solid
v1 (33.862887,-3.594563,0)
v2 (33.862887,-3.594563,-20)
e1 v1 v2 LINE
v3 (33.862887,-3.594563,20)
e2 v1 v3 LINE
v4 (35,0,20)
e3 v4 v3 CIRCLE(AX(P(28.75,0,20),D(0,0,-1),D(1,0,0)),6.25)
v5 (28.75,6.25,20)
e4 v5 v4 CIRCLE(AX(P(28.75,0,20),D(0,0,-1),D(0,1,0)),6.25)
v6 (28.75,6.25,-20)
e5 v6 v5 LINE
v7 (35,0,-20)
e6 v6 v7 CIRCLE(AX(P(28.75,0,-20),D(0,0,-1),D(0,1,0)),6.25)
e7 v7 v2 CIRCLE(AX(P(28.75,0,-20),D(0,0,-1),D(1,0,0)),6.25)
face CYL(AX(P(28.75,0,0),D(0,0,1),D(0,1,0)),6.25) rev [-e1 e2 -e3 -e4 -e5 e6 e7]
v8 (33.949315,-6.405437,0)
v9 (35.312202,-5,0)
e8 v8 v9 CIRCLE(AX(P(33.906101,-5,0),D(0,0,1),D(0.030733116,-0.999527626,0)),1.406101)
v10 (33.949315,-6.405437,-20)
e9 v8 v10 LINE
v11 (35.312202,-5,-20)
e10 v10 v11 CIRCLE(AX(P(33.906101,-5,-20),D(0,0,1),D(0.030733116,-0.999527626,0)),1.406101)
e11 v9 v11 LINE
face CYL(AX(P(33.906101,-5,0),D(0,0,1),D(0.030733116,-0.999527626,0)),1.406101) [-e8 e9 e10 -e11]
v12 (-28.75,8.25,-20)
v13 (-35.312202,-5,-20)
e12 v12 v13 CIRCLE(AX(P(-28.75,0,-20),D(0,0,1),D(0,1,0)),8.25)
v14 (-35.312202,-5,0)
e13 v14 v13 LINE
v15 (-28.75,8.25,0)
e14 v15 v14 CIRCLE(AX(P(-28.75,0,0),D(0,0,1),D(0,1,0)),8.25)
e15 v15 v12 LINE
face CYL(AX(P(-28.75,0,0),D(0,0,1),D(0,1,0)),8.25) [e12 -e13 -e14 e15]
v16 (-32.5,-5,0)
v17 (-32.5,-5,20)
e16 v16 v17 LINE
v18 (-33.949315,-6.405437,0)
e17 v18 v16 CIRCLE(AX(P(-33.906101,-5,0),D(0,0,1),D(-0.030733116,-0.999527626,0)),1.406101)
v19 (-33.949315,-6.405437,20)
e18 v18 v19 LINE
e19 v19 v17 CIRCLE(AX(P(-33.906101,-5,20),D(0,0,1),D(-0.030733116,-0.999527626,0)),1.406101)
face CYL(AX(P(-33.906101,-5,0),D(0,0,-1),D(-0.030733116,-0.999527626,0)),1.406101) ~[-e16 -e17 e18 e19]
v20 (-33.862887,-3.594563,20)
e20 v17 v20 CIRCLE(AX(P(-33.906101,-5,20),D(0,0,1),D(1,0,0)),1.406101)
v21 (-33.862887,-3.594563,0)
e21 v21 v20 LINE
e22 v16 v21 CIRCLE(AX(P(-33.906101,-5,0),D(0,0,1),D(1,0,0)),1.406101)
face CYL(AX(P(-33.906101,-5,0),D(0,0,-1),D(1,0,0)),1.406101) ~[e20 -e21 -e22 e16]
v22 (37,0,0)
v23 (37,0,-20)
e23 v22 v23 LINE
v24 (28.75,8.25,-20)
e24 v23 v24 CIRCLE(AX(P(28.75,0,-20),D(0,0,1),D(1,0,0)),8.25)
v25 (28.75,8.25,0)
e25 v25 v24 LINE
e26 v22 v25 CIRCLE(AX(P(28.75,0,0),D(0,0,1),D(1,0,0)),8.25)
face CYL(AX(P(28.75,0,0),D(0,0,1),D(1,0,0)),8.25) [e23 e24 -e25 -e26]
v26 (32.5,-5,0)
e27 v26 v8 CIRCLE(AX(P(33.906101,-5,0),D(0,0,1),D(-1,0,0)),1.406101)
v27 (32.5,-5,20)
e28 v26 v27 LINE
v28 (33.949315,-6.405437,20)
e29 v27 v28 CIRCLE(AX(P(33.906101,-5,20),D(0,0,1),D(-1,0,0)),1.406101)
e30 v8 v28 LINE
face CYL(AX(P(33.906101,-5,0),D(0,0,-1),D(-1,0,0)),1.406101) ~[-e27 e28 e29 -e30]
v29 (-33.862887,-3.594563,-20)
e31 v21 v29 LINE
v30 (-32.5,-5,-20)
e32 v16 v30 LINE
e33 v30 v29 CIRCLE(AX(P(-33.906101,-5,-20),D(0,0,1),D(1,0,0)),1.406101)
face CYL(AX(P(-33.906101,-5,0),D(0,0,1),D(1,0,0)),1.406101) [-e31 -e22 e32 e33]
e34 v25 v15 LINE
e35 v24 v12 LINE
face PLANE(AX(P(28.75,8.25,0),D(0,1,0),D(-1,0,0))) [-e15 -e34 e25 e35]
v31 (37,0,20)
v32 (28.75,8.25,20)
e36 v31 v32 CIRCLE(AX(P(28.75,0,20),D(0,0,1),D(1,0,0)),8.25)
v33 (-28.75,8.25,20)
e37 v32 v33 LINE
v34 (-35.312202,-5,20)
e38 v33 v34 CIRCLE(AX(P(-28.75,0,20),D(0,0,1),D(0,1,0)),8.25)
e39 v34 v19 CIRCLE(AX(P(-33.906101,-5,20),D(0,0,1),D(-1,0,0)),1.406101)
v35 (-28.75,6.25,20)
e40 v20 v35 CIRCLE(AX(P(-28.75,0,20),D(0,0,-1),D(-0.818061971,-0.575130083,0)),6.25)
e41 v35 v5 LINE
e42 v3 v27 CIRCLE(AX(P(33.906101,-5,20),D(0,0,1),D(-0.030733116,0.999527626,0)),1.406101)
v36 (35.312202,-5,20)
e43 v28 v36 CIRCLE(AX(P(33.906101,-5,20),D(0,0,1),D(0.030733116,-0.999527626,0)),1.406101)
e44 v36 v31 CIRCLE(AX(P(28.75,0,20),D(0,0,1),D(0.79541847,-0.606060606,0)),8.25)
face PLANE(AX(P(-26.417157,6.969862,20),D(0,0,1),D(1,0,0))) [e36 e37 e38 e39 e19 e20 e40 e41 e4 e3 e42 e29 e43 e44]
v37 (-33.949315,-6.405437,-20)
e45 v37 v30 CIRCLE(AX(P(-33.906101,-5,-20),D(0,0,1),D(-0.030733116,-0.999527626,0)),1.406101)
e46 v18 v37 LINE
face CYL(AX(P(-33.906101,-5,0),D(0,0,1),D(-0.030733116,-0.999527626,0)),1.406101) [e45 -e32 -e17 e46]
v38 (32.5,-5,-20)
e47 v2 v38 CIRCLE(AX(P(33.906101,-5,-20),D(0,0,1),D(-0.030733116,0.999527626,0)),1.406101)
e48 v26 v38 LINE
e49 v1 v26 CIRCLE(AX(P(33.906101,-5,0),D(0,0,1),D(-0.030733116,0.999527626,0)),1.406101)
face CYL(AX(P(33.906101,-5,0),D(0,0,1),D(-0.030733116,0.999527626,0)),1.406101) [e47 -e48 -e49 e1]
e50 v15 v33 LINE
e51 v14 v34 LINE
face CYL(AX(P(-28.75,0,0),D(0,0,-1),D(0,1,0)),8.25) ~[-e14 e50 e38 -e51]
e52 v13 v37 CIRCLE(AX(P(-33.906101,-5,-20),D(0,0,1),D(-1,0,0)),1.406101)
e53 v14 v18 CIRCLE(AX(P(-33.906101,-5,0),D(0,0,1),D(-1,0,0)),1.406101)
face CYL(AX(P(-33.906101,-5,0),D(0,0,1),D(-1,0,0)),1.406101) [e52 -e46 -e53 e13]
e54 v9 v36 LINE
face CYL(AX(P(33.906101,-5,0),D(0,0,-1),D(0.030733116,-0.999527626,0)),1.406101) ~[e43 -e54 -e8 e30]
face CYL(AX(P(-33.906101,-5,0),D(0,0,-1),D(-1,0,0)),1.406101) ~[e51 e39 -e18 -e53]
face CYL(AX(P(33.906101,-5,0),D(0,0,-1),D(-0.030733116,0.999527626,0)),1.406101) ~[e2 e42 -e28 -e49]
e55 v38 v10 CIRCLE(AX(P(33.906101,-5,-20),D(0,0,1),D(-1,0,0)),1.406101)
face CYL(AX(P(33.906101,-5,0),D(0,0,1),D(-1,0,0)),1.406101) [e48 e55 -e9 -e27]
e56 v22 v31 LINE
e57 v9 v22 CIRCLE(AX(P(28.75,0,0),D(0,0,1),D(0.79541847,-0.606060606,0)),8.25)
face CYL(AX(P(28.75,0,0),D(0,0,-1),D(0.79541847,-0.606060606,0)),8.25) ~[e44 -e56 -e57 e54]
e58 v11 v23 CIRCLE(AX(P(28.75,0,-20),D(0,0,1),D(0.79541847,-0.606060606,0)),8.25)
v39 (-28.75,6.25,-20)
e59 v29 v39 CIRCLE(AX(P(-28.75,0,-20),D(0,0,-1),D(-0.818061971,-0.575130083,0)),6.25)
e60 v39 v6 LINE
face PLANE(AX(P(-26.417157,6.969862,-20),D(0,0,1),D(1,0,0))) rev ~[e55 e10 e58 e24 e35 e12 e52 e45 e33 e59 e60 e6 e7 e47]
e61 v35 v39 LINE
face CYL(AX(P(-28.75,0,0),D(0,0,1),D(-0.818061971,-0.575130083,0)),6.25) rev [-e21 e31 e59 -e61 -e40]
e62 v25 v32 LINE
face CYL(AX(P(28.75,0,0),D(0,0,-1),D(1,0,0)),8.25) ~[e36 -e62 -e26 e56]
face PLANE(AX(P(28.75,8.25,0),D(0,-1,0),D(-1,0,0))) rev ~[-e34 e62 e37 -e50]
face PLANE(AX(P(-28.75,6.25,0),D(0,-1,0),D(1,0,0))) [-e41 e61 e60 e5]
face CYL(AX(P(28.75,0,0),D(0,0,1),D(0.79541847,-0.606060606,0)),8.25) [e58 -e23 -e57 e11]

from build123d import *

# Parameters (mm, degrees)
F1_DEPTH = 20


with BuildPart() as f1:
    # F0 (on Top) → F1 (new body, symmetric)
    with BuildSketch(Plane.XY):
        with BuildLine():
            Line((-28.75, 8.25), (-28.75, 6.25))
            Line((-28.75, 6.25), (-23.3648351929, 6.25))
            ThreePointArc((-23.3648351929, 6.25), (-25.8777186767, 7.7338541491), (-28.75, 8.25))
        make_face()
        with BuildLine():
            ThreePointArc((-33.8628873162, -3.5945630182), (-34.2965538339, 2.8806666881), (-28.75, 6.25))
            Line((-28.75, 6.25), (-28.75, 8.25))
            ThreePointArc((-28.75, 8.25), (-36.1429865413, 3.661454629), (-35.3122023742, -5))
            ThreePointArc((-35.3122023742, -5), (-34.8849672334, -3.9905735233), (-33.8628873162, -3.5945630182))
        make_face()
        with BuildLine():
            ThreePointArc((-28.75, 8.25), (-25.8777186767, 7.7338541491), (-23.3648351929, 6.25))
            Line((-23.3648351929, 6.25), (23.3648351929, 6.25))
            ThreePointArc((23.3648351929, 6.25), (25.8777186767, 7.7338541491), (28.75, 8.25))
            Line((28.75, 8.25), (-28.75, 8.25))
        make_face()
        with BuildLine():
            ThreePointArc((-32.5, -5), (-32.8966747104, -4.0211339537), (-33.8628873162, -3.5945630182))
            ThreePointArc((-33.8628873162, -3.5945630182), (-33.2368147022, -4.3509761925), (-32.5, -5))
        make_face()
        with BuildLine():
            ThreePointArc((-32.5, -5), (-33.2368147022, -4.3509761925), (-33.8628873162, -3.5945630182))
            ThreePointArc((-33.8628873162, -3.5945630182), (-34.8849672334, -3.9905735233), (-35.3122023742, -5))
            Line((-35.3122023742, -5), (-32.5, -5))
        make_face()
        with BuildLine():
            ThreePointArc((28.75, 8.25), (25.8777186767, 7.7338541491), (23.3648351929, 6.25))
            Line((23.3648351929, 6.25), (28.75, 6.25))
            Line((28.75, 6.25), (28.75, 8.25))
        make_face()
        with BuildLine():
            ThreePointArc((-33.949315058, -6.4054369818), (-32.9272351408, -6.0094264767), (-32.5, -5))
            Line((-32.5, -5), (-35.3122023742, -5))
            ThreePointArc((-35.3122023742, -5), (-34.672595407, -5.7432885741), (-33.949315058, -6.4054369818))
        make_face()
        with BuildLine():
            ThreePointArc((37, 0), (34.5836309448, 5.8336309448), (28.75, 8.25))
            Line((28.75, 8.25), (28.75, 6.25))
            ThreePointArc((28.75, 6.25), (33.1694173824, 4.4194173824), (35, 0))
            ThreePointArc((35, 0), (34.7089447776, -1.8850668786), (33.8628873162, -3.5945630182))
            ThreePointArc((33.8628873162, -3.5945630182), (34.8849672334, -3.9905735233), (35.3122023742, -5))
            ThreePointArc((35.3122023742, -5), (36.5666703137, -2.6385915194), (37, 0))
        make_face()
        with BuildLine():
            ThreePointArc((-33.949315058, -6.4054369818), (-34.672595407, -5.7432885741), (-35.3122023742, -5))
            ThreePointArc((-35.3122023742, -5), (-34.9155276638, -5.9788660463), (-33.949315058, -6.4054369818))
        make_face()
        with BuildLine():
            ThreePointArc((33.949315058, -6.4054369818), (34.9155276638, -5.9788660463), (35.3122023742, -5))
            ThreePointArc((35.3122023742, -5), (34.672595407, -5.7432885741), (33.949315058, -6.4054369818))
        make_face()
        with BuildLine():
            ThreePointArc((33.949315058, -6.4054369818), (34.672595407, -5.7432885741), (35.3122023742, -5))
            Line((35.3122023742, -5), (32.5, -5))
            ThreePointArc((32.5, -5), (32.9272351408, -6.0094264767), (33.949315058, -6.4054369818))
        make_face()
        with BuildLine():
            Line((32.5, -5), (35.3122023742, -5))
            ThreePointArc((35.3122023742, -5), (34.8849672334, -3.9905735233), (33.8628873162, -3.5945630182))
            ThreePointArc((33.8628873162, -3.5945630182), (33.2368147022, -4.3509761925), (32.5, -5))
        make_face()
        with BuildLine():
            ThreePointArc((33.8628873162, -3.5945630182), (32.8966747104, -4.0211339537), (32.5, -5))
            ThreePointArc((32.5, -5), (33.2368147022, -4.3509761925), (33.8628873162, -3.5945630182))
        make_face()
    extrude(amount=F1_DEPTH, both=True)


solid = f1.part
